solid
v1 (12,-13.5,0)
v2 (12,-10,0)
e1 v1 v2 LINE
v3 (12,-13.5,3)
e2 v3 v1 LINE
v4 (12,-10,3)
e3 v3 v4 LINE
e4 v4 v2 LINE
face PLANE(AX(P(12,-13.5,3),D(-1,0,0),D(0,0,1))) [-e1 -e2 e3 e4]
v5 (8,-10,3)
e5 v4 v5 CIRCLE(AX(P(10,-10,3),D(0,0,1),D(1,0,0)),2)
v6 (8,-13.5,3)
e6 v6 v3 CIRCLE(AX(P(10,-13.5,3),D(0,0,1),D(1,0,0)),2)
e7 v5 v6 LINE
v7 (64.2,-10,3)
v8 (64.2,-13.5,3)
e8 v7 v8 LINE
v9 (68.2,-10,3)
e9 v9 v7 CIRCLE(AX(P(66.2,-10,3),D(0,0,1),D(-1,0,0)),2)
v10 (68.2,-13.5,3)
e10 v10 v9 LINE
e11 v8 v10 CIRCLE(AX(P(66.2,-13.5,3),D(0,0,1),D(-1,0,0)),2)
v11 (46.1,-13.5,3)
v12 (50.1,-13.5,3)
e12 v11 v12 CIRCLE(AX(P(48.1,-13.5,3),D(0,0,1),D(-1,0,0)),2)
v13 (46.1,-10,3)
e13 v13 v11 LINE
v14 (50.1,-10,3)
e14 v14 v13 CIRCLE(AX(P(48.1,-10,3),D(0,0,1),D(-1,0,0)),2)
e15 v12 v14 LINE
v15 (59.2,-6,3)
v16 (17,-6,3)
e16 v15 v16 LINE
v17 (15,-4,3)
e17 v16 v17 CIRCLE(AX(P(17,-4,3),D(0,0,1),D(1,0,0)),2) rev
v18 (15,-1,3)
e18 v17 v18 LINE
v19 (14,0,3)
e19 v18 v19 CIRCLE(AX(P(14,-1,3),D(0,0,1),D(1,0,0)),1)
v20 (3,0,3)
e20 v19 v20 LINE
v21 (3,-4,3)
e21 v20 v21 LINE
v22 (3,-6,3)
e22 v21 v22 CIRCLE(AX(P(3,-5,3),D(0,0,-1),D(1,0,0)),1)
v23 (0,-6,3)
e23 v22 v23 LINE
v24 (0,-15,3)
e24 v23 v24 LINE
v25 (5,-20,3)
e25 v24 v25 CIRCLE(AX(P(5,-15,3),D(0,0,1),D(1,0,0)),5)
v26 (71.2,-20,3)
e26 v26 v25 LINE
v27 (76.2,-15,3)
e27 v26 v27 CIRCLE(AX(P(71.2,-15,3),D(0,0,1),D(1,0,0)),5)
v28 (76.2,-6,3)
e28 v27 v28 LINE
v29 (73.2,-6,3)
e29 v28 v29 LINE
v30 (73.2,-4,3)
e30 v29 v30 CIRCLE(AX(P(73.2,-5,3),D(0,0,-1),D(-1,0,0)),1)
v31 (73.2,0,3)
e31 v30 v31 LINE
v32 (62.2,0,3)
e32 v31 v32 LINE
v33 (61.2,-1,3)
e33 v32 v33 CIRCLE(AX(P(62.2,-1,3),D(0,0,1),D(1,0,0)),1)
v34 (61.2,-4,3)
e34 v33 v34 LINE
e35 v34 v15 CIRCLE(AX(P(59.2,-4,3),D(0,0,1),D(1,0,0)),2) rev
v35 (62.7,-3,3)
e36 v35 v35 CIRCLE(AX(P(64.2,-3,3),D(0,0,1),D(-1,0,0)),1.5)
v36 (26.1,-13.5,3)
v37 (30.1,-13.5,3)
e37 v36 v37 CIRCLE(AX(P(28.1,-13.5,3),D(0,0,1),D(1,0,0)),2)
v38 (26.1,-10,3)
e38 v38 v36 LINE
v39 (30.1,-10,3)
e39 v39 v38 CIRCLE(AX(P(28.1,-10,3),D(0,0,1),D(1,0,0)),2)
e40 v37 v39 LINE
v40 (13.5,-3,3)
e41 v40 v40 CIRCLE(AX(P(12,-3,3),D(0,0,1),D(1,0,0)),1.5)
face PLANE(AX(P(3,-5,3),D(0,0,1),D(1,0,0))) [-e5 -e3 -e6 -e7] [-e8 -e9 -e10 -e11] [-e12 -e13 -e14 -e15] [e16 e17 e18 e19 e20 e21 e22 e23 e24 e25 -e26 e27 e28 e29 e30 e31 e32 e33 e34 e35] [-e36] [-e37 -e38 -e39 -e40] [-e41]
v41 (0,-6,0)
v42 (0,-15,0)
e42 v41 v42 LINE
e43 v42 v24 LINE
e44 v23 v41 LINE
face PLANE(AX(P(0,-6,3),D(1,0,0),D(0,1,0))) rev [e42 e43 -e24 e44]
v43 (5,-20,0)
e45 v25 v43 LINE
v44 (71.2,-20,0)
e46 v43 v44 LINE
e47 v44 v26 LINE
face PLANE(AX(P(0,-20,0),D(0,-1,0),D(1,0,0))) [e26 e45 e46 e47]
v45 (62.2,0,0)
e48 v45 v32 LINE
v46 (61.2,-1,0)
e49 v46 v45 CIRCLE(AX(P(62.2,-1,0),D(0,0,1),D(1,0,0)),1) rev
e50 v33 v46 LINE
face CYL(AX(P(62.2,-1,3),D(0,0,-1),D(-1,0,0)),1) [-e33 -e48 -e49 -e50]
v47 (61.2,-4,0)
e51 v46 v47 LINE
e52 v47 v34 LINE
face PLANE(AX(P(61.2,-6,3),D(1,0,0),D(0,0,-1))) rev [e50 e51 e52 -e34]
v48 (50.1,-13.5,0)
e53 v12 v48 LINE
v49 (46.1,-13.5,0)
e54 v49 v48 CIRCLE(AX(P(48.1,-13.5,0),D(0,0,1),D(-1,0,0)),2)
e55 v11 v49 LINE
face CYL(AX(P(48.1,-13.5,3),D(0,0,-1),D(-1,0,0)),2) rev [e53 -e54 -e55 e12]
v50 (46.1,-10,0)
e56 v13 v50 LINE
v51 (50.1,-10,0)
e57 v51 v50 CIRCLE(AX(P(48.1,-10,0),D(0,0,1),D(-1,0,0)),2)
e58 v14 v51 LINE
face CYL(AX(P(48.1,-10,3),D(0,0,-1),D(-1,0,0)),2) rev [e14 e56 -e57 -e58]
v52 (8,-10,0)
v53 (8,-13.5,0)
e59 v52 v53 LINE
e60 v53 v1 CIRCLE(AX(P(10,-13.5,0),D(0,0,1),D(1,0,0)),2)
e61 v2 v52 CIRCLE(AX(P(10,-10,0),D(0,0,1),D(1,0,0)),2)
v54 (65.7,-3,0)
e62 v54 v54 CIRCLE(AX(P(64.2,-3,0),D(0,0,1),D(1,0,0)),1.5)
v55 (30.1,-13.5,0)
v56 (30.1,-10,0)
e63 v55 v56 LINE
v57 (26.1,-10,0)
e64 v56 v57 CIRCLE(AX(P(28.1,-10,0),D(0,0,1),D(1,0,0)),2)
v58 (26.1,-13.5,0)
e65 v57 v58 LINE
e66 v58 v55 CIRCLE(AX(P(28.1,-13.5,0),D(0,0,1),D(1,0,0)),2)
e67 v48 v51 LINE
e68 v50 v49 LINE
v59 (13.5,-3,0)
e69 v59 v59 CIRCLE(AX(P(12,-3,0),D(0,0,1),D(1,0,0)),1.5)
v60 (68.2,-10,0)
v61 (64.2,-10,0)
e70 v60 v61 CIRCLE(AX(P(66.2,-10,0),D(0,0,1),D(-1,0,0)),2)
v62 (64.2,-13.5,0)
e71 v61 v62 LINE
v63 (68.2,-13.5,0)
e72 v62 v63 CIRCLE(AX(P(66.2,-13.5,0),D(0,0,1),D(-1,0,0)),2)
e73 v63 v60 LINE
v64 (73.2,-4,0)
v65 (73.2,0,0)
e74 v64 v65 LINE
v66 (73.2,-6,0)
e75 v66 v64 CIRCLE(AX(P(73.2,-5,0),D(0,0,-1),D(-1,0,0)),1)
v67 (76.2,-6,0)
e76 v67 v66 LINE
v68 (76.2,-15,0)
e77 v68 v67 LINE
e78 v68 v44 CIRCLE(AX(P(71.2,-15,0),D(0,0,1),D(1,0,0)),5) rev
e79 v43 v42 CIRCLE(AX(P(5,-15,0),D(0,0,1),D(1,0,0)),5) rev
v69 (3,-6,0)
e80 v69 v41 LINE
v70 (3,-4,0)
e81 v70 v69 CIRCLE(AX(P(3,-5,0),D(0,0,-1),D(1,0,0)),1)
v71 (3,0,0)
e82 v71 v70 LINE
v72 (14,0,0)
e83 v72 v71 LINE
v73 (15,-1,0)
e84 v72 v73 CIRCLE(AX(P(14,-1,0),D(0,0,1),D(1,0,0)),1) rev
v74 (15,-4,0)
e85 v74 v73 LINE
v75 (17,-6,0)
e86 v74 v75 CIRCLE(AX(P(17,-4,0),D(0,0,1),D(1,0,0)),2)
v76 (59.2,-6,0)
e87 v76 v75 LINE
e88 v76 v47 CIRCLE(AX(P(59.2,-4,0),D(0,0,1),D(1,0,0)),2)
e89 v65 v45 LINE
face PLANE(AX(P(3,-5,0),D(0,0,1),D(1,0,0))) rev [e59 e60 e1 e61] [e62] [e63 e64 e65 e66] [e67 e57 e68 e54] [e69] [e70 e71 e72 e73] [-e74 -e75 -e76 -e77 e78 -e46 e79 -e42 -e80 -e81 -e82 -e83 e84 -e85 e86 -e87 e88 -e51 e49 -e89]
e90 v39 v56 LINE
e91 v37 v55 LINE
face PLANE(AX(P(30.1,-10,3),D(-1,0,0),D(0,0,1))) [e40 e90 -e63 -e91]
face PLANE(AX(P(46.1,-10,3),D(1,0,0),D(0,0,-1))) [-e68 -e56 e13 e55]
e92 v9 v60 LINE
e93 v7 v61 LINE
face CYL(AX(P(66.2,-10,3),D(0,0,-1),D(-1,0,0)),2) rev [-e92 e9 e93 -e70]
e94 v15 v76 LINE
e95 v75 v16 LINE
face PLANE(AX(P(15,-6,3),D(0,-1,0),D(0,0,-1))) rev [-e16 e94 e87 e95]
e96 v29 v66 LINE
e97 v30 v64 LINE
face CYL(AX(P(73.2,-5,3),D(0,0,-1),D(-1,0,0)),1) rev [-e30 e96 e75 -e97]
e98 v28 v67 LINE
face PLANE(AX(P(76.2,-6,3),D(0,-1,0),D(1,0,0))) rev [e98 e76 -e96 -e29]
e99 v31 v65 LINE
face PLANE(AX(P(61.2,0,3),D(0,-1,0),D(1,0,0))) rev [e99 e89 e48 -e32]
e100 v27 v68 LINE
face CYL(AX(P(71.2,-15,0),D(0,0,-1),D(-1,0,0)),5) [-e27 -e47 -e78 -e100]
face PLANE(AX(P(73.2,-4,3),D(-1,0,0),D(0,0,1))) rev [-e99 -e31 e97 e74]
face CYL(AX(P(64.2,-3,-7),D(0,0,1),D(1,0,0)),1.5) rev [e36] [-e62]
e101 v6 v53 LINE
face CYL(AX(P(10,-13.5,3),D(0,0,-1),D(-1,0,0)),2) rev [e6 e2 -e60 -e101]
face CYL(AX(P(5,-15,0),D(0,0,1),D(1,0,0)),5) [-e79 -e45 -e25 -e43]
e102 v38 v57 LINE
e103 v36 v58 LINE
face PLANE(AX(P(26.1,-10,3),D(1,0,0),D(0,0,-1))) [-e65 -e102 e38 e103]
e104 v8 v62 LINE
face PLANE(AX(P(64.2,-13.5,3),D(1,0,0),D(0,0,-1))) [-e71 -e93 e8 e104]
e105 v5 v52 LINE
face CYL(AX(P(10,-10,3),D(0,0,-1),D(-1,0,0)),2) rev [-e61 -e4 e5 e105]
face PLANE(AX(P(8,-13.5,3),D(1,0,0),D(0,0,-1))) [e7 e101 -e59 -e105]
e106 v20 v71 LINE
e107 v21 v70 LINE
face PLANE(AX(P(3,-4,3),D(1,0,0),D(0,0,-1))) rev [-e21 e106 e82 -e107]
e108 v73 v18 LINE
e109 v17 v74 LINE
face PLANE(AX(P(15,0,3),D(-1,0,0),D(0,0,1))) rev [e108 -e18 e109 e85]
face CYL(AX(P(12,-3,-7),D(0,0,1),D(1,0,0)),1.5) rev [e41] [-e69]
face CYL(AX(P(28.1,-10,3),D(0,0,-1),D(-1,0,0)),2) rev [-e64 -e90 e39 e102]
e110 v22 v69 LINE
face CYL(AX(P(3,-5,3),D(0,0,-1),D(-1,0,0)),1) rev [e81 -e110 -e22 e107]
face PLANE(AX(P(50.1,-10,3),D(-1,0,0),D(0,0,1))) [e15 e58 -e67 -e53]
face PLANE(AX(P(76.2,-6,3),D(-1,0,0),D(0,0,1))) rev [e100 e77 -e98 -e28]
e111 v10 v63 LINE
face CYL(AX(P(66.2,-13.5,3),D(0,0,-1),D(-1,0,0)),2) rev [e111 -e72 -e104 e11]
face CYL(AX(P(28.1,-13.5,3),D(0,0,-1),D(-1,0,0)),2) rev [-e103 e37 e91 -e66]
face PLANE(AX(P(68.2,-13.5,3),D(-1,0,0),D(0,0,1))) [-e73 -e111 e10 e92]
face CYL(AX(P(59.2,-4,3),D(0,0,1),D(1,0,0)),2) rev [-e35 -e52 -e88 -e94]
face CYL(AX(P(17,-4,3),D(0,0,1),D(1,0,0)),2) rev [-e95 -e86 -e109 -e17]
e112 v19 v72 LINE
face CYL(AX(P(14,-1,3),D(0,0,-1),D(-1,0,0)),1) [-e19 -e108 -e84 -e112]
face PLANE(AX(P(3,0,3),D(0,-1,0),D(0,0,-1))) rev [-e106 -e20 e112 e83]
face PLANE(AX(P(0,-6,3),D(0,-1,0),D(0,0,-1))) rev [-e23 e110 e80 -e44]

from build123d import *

# Parameters (mm, degrees)
EXTRUDE_1_DEPTH     = 3
FILLET_1_R          = 2
SKETCH_2_R          = 1.5
CUT_EXTRUDE_1_DEPTH = 10
FILLET_3_R          = 1
SKETCH_3_W          = 76.2
SKETCH_3_H          = 3
EXTRUDE_2_DEPTH     = 3
FILLET_4_R          = 5


# Read off the part's stored shape, not the designer's step: 凸台-拉伸1
with BuildPart() as part:
    # 凸台-拉伸1 outline → 凸台-拉伸1 (new body)
    with BuildSketch(Plane.XY):
        with BuildLine():
            Line((76.2, -17), (76.2, -6))
            Line((76.2, -6), (73.2, -6))
            ThreePointArc((73.2, -6), (72.2, -5), (73.2, -4))
            Line((73.2, -4), (73.2, 0))
            Line((73.2, 0), (61.2, 0))
            Line((61.2, 0), (61.2, -6))
            Line((61.2, -6), (15, -6))
            Line((15, -6), (15, 0))
            Line((15, 0), (3, 0))
            Line((3, 0), (3, -4))
            ThreePointArc((3, -4), (4, -5), (3, -6))
            Line((3, -6), (0, -6))
            Line((0, -6), (0, -17))
            Line((0, -17), (76.2, -17))
        make_face()
        with BuildLine():
            Line((12, -10), (12, -13.5))
            ThreePointArc((12, -13.5), (10, -15.5), (8, -13.5))
            Line((8, -13.5), (8, -10))
            ThreePointArc((8, -10), (10, -8), (12, -10))
        make_face(mode=Mode.SUBTRACT)
        with BuildLine():
            Line((26.1, -13.5), (26.1, -10))
            ThreePointArc((26.1, -10), (28.1, -8), (30.1, -10))
            Line((30.1, -10), (30.1, -13.5))
            ThreePointArc((30.1, -13.5), (28.1, -15.5), (26.1, -13.5))
        make_face(mode=Mode.SUBTRACT)
        with BuildLine():
            Line((46.1, -13.5), (46.1, -10))
            ThreePointArc((46.1, -10), (48.1, -8), (50.1, -10))
            Line((50.1, -10), (50.1, -13.5))
            ThreePointArc((50.1, -13.5), (48.1, -15.5), (46.1, -13.5))
        make_face(mode=Mode.SUBTRACT)
        with BuildLine():
            Line((68.2, -10), (68.2, -13.5))
            ThreePointArc((68.2, -13.5), (66.2, -15.5), (64.2, -13.5))
            Line((64.2, -13.5), (64.2, -10))
            ThreePointArc((64.2, -10), (66.2, -8), (68.2, -10))
        make_face(mode=Mode.SUBTRACT)
    extrude(amount=EXTRUDE_1_DEPTH)

    # 圆角1
    fillet_1_edges = [part.edges().sort_by_distance(p)[0] for p in [
        (15, -6, 1.5),
        (61.2, -6, 1.5),
    ]]
    fillet(fillet_1_edges, radius=FILLET_1_R)

    # 草图2 → 切除-拉伸1 (cut)
    with BuildSketch(Plane.XY.offset(3)):
        with Locations((12, -3)):
            Circle(SKETCH_2_R)
        with Locations((64.2, -3)):
            Circle(SKETCH_2_R)
    extrude(amount=-CUT_EXTRUDE_1_DEPTH, mode=Mode.SUBTRACT)

    # 圆角3
    fillet_3_edges = [part.edges().sort_by_distance(p)[0] for p in [
        (15, 0, 1.5),
        (61.2, 0, 1.5),
    ]]
    fillet(fillet_3_edges, radius=FILLET_3_R)

    # 草图3 → 凸台-拉伸2 (add)
    with BuildSketch(Plane.XZ.offset(17)):
        with Locations((38.1, 1.5)):
            Rectangle(SKETCH_3_W, SKETCH_3_H)
    extrude(amount=EXTRUDE_2_DEPTH)

    # 圆角4
    fillet_4_edges = [part.edges().sort_by_distance(p)[0] for p in [
        (0, -20, 1.5),
        (76.2, -20, 1.5),
    ]]
    fillet(fillet_4_edges, radius=FILLET_4_R)


solid = part.part
